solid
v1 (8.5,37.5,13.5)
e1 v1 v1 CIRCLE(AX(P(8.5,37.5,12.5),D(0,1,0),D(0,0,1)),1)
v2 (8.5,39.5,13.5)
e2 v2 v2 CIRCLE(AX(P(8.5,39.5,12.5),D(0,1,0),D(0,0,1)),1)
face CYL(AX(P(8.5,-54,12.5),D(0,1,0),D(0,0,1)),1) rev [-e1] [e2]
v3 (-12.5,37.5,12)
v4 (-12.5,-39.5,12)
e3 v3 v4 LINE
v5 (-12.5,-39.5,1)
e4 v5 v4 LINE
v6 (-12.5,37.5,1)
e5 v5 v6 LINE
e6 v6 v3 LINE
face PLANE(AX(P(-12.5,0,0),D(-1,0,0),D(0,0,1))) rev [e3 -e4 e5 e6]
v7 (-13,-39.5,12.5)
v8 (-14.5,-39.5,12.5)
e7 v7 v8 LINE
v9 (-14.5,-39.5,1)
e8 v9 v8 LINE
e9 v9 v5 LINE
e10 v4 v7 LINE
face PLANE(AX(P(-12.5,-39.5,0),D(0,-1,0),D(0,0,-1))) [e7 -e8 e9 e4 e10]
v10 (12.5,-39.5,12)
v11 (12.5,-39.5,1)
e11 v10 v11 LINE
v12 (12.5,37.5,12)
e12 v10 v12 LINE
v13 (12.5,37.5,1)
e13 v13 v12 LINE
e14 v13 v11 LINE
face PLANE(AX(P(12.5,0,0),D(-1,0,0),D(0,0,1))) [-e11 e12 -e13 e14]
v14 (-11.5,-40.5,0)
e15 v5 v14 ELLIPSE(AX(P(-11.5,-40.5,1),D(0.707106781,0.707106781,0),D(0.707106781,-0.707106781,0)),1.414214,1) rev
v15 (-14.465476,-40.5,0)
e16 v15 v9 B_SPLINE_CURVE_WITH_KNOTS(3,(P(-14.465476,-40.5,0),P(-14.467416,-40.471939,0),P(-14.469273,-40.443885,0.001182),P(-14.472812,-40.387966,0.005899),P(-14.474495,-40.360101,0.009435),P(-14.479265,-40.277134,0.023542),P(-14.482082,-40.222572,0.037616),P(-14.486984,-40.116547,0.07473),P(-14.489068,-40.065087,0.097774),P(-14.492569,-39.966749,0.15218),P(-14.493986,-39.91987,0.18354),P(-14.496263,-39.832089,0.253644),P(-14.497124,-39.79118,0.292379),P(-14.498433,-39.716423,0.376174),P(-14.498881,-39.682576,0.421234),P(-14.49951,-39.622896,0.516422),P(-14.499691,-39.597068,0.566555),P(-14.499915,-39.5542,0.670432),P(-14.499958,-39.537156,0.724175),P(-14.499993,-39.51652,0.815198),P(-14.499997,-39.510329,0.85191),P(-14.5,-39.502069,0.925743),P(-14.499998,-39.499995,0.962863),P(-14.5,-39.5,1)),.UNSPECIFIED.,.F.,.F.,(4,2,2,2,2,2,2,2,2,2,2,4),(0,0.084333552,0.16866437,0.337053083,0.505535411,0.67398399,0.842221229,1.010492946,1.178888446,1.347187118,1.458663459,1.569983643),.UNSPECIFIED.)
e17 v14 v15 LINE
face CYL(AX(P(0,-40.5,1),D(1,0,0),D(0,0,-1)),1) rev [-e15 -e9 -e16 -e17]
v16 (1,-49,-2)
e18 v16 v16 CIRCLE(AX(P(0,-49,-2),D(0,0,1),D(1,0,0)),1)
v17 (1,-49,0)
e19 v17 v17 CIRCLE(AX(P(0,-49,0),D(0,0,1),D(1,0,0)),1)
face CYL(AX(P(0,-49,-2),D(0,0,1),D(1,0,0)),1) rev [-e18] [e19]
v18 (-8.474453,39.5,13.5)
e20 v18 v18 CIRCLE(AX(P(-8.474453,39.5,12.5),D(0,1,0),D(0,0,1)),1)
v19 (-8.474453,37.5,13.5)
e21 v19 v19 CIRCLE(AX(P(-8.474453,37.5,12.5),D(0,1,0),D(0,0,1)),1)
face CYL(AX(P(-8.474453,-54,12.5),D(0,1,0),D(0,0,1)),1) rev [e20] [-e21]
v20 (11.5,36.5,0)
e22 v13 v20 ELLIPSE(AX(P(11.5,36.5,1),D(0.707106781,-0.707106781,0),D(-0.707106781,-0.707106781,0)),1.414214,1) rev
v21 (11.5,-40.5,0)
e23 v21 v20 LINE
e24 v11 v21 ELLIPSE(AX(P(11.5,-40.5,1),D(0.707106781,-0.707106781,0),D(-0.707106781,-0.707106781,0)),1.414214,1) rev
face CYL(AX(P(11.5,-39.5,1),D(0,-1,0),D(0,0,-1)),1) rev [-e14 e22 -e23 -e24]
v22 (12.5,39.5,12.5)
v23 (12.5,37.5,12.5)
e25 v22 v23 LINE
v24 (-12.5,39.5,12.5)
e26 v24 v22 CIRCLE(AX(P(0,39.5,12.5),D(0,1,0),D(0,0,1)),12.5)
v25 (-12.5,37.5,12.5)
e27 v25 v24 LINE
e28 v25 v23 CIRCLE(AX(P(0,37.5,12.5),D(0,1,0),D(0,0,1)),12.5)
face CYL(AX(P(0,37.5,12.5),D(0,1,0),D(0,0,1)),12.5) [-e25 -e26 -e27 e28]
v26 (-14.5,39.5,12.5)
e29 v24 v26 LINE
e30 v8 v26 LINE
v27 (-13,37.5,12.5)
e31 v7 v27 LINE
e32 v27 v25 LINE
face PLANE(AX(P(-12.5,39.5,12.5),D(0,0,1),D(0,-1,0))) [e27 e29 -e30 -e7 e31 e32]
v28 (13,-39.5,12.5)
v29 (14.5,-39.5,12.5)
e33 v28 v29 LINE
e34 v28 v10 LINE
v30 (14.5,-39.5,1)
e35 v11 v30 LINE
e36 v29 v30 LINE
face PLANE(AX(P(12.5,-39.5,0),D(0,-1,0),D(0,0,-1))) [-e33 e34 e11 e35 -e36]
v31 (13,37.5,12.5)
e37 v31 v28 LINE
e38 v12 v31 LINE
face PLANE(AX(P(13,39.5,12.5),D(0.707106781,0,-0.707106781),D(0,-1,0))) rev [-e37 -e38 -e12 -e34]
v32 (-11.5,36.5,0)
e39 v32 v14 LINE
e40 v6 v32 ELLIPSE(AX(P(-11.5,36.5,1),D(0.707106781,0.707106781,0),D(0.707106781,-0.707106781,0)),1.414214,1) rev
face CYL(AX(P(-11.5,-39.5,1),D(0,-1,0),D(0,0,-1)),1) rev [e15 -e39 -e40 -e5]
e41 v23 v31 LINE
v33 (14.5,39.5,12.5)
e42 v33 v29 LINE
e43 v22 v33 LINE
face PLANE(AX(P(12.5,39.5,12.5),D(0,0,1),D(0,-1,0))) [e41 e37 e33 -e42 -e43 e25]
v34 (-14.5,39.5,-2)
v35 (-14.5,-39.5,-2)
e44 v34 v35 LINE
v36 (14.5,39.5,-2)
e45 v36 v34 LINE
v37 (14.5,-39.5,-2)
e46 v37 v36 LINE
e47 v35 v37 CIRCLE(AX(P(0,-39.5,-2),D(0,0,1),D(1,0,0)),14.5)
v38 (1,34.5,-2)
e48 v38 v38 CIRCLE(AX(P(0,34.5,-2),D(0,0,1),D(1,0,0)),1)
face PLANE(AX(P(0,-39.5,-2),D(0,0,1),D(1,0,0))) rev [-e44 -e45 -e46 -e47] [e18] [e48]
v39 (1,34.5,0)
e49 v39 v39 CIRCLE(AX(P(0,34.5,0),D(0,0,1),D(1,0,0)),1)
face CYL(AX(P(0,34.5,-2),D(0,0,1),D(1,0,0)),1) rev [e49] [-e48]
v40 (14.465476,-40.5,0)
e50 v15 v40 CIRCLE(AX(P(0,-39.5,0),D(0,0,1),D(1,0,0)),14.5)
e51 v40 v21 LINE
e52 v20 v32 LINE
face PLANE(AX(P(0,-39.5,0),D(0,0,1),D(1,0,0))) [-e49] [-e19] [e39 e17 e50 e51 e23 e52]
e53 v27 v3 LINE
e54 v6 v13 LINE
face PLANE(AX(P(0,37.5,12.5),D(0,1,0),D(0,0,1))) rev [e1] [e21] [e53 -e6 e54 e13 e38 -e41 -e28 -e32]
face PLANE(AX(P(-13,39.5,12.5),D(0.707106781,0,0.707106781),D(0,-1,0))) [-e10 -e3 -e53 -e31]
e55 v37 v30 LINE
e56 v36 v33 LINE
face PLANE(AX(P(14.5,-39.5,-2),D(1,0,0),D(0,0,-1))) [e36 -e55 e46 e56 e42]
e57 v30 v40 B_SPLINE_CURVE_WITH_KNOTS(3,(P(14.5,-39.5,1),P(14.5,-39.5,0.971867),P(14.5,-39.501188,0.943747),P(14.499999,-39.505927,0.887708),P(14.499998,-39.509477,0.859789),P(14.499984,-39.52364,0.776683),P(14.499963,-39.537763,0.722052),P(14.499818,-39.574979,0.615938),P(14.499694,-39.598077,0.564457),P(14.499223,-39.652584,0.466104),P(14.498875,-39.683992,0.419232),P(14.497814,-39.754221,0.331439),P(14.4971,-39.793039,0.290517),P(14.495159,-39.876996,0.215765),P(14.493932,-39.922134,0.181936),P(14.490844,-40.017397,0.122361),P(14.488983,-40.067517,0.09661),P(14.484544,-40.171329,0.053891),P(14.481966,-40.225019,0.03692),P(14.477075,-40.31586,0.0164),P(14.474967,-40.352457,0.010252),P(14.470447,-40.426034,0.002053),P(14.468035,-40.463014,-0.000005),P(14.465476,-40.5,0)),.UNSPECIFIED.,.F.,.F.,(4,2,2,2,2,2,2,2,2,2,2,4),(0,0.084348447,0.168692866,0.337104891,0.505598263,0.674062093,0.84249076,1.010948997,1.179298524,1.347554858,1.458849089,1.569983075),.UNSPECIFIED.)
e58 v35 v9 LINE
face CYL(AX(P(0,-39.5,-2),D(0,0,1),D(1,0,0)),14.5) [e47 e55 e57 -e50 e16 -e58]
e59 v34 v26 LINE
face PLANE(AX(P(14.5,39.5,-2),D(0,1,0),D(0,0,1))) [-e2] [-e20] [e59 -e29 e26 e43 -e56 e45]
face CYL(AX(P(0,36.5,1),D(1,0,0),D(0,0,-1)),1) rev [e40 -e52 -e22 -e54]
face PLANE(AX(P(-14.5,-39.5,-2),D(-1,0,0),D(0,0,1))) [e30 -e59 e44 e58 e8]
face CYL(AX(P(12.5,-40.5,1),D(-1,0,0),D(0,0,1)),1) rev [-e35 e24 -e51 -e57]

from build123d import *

# Parameters (mm, degrees)
ESQUISSE1_R             = 1
BOSS_EXTRU_2_DEPTH      = 2
ESQUISSE4_W             = 12.5
ESQUISSE4_H             = 79
BOSS_EXTRU_3_DEPTH      = 2
ESQUISSE6_W             = 12.5
ESQUISSE6_H             = 79
BOSS_EXTRU_4_DEPTH      = 2
BOSS_EXTRU_7_DEPTH      = 2
ESQUISSE14_R            = 1
ENL_V_MAT_EXTRU_4_DEPTH = 98.864702523
CHANFREIN3_SIZE         = 0.5
CONG_1_R                = 1


with BuildPart() as part:
    # Esquisse1 → Boss.-Extru.2 (new body)
    with BuildSketch(Plane.XY):
        with BuildLine():
            Line((14.5, -39.5), (14.5, 39.5))
            Line((14.5, 39.5), (-14.5, 39.5))
            Line((-14.5, 39.5), (-14.5, -39.5))
            ThreePointArc((-14.5, -39.5), (0, -54), (14.5, -39.5))
        make_face()
        with Locations((0, 34.5)):
            Circle(ESQUISSE1_R, mode=Mode.SUBTRACT)
        with Locations((0, -49)):
            Circle(ESQUISSE1_R, mode=Mode.SUBTRACT)
    extrude(amount=-BOSS_EXTRU_2_DEPTH)

    # Esquisse4 → Boss.-Extru.3 (add)
    with BuildSketch(Plane.ZY.offset(14.5)):
        with Locations((6.25, 0)):
            Rectangle(ESQUISSE4_W, ESQUISSE4_H)
    extrude(amount=-BOSS_EXTRU_3_DEPTH)

    # Esquisse6 → Boss.-Extru.4 (add)
    with BuildSketch(Plane(origin=(14.5, 0, 0), x_dir=(0, 0, -1), z_dir=(1, 0, 0))):
        with Locations((-6.25, 0)):
            Rectangle(ESQUISSE6_W, ESQUISSE6_H)
    extrude(amount=-BOSS_EXTRU_4_DEPTH)

    # Esquisse11 → Boss.-Extru.7 (add)
    with BuildSketch(Plane(origin=(0, 39.5, 0), x_dir=(1, 0, 0), z_dir=(0, 1, 0))):
        with BuildLine():
            Line((-12.5, 0), (12.5, 0))
            Line((12.5, 0), (12.5, -12.5))
            ThreePointArc((12.5, -12.5), (0, -25), (-12.5, -12.5))
            Line((-12.5, -12.5), (-12.5, 0))
        make_face()
    extrude(amount=-BOSS_EXTRU_7_DEPTH)

    # Esquisse14 → Enlèv. mat.-Extru.4 (cut, through all)
    with BuildSketch(Plane(origin=(0, 39.5, 0), x_dir=(1, 0, 0), z_dir=(0, 1, 0))):
        with Locations(Location((-8.474453363, -12.5, 0), (0, 0, 270))):
            Circle(ESQUISSE14_R)
        with Locations(Location((8.5, -12.5, 0), (0, 0, 270))):
            Circle(ESQUISSE14_R)
    extrude(amount=-ENL_V_MAT_EXTRU_4_DEPTH, mode=Mode.SUBTRACT)

    # Chanfrein3
    chanfrein3_edges = [part.edges().sort_by_distance(p)[0] for p in [
        (-12.5, -1, 12.5),
        (12.5, -1, 12.5),
    ]]
    chamfer(chanfrein3_edges, length=CHANFREIN3_SIZE)

    # Congé1
    # the kernel refuses this fillet: 1 mm, written as the material it adds along each edge
    with BuildSketch(Plane(origin=(-14.5, -39.5, 0), x_dir=(0, -1, 0), z_dir=(1, 0, 0))) as cong_1_piece_1_section:
        with BuildLine():
            CenterArc((CONG_1_R, -CONG_1_R), CONG_1_R, 90, 90)
            Line((0, -CONG_1_R), (-CONG_1_R * 0.02, -CONG_1_R))
            Line((-CONG_1_R * 0.02, -CONG_1_R), (-CONG_1_R * 0.02, CONG_1_R * 0.02))
            Line((-CONG_1_R * 0.02, CONG_1_R * 0.02), (CONG_1_R, CONG_1_R * 0.02))
            Line((CONG_1_R, CONG_1_R * 0.02), (CONG_1_R, 0))
        make_face()
    cong_1_piece_1 = extrude(amount=2, mode=Mode.PRIVATE)
    cong_1_piece_1 = cong_1_piece_1 & Plane(origin=(0, -39.5, 0.22667443), x_dir=(-1, 0, 0), z_dir=(0, 0, 1)) * Cylinder(14.5, 8, mode=Mode.PRIVATE)
    add(cong_1_piece_1)
    with BuildSketch(Plane(origin=(12.5, -39.5, 0), x_dir=(0, 0, 1), z_dir=(0, 1, 0)), Plane(origin=(-12.5, -39.5, 0), x_dir=(1, 0, 0), z_dir=(0, 1, 0))) as cong_1_piece_2:
        with BuildLine():
            CenterArc((CONG_1_R, -CONG_1_R), CONG_1_R, 90, 90)
            Line((0, -CONG_1_R), (-CONG_1_R * 0.02, -CONG_1_R))
            Line((-CONG_1_R * 0.02, -CONG_1_R), (-CONG_1_R * 0.02, CONG_1_R * 0.02))
            Line((-CONG_1_R * 0.02, CONG_1_R * 0.02), (CONG_1_R, CONG_1_R * 0.02))
            Line((CONG_1_R, CONG_1_R * 0.02), (CONG_1_R, 0))
        make_face()
    extrude(amount=77)
    with BuildSketch(Plane(origin=(14.5, -39.5, 0), x_dir=(0, 0, 1), z_dir=(-1, 0, 0))) as cong_1_piece_3_section:
        with BuildLine():
            CenterArc((CONG_1_R, -CONG_1_R), CONG_1_R, 90, 90)
            Line((0, -CONG_1_R), (-CONG_1_R * 0.02, -CONG_1_R))
            Line((-CONG_1_R * 0.02, -CONG_1_R), (-CONG_1_R * 0.02, CONG_1_R * 0.02))
            Line((-CONG_1_R * 0.02, CONG_1_R * 0.02), (CONG_1_R, CONG_1_R * 0.02))
            Line((CONG_1_R, CONG_1_R * 0.02), (CONG_1_R, 0))
        make_face()
    cong_1_piece_3 = extrude(amount=2, mode=Mode.PRIVATE)
    cong_1_piece_3 = cong_1_piece_3 & Plane(origin=(0, -39.5, 0.226674419), x_dir=(-1, 0, 0), z_dir=(0, 0, 1)) * Cylinder(14.5, 8, mode=Mode.PRIVATE)
    add(cong_1_piece_3)
    with BuildSketch(Plane(origin=(-12.5, 37.5, 0), x_dir=(0, 0, 1), z_dir=(1, 0, 0))) as cong_1_piece_4:
        with BuildLine():
            CenterArc((CONG_1_R, CONG_1_R), CONG_1_R, 180, 90)
            Line((0, CONG_1_R), (-CONG_1_R * 0.02, CONG_1_R))
            Line((-CONG_1_R * 0.02, CONG_1_R), (-CONG_1_R * 0.02, -CONG_1_R * 0.02))
            Line((-CONG_1_R * 0.02, -CONG_1_R * 0.02), (CONG_1_R, -CONG_1_R * 0.02))
            Line((CONG_1_R, -CONG_1_R * 0.02), (CONG_1_R, 0))
        make_face()
    extrude(amount=25)
    with BuildSketch(Plane(origin=(-14.5, -39.5, 0), x_dir=(0, -1, 0), z_dir=(1, 0, 0))) as cong_1_piece_5a_section:
        with BuildLine():
            CenterArc((CONG_1_R, -CONG_1_R), CONG_1_R, 90, 90)
            Line((0, -CONG_1_R), (-CONG_1_R * 0.02, -CONG_1_R))
            Line((-CONG_1_R * 0.02, -CONG_1_R), (-CONG_1_R * 0.02, CONG_1_R * 0.02))
            Line((-CONG_1_R * 0.02, CONG_1_R * 0.02), (CONG_1_R, CONG_1_R * 0.02))
            Line((CONG_1_R, CONG_1_R * 0.02), (CONG_1_R, 0))
        make_face()
    cong_1_piece_5a = extrude(amount=4.5, mode=Mode.PRIVATE)
    cong_1_piece_5a = split(cong_1_piece_5a, bisect_by=Plane(origin=(-12.5, -39.726395114, 0.226395114), z_dir=(1, 0, 0)), keep=Keep.TOP, mode=Mode.PRIVATE)
    with BuildSketch(Plane(origin=(-12.5, -42, 0), x_dir=(1, 0, 0), z_dir=(0, 1, 0))) as cong_1_piece_5b_section:
        with BuildLine():
            CenterArc((CONG_1_R, -CONG_1_R), CONG_1_R, 90, 90)
            Line((0, -CONG_1_R), (-CONG_1_R * 0.02, -CONG_1_R))
            Line((-CONG_1_R * 0.02, -CONG_1_R), (-CONG_1_R * 0.02, CONG_1_R * 0.02))
            Line((-CONG_1_R * 0.02, CONG_1_R * 0.02), (CONG_1_R, CONG_1_R * 0.02))
            Line((CONG_1_R, CONG_1_R * 0.02), (CONG_1_R, 0))
        make_face()
    cong_1_piece_5b = extrude(amount=79.5, mode=Mode.PRIVATE)
    cong_1_piece_5b = split(cong_1_piece_5b, bisect_by=Plane(origin=(-12.273604886, -39.5, 0.226395114), z_dir=(0, -1, 0)), keep=Keep.TOP, mode=Mode.PRIVATE)
    cong_1_piece_5 = cong_1_piece_5a & cong_1_piece_5b
    add(cong_1_piece_5)
    with BuildSketch(Plane(origin=(14.5, -39.5, 0), x_dir=(0, 0, 1), z_dir=(-1, 0, 0))) as cong_1_piece_6a_section:
        with BuildLine():
            CenterArc((CONG_1_R, -CONG_1_R), CONG_1_R, 90, 90)
            Line((0, -CONG_1_R), (-CONG_1_R * 0.02, -CONG_1_R))
            Line((-CONG_1_R * 0.02, -CONG_1_R), (-CONG_1_R * 0.02, CONG_1_R * 0.02))
            Line((-CONG_1_R * 0.02, CONG_1_R * 0.02), (CONG_1_R, CONG_1_R * 0.02))
            Line((CONG_1_R, CONG_1_R * 0.02), (CONG_1_R, 0))
        make_face()
    cong_1_piece_6a = extrude(amount=4.5, mode=Mode.PRIVATE)
    cong_1_piece_6a = split(cong_1_piece_6a, bisect_by=Plane(origin=(12.5, -39.726395114, 0.226395114), z_dir=(-1, 0, 0)), keep=Keep.TOP, mode=Mode.PRIVATE)
    with BuildSketch(Plane(origin=(12.5, -42, 0), x_dir=(0, 0, 1), z_dir=(0, 1, 0))) as cong_1_piece_6b_section:
        with BuildLine():
            CenterArc((CONG_1_R, -CONG_1_R), CONG_1_R, 90, 90)
            Line((0, -CONG_1_R), (-CONG_1_R * 0.02, -CONG_1_R))
            Line((-CONG_1_R * 0.02, -CONG_1_R), (-CONG_1_R * 0.02, CONG_1_R * 0.02))
            Line((-CONG_1_R * 0.02, CONG_1_R * 0.02), (CONG_1_R, CONG_1_R * 0.02))
            Line((CONG_1_R, CONG_1_R * 0.02), (CONG_1_R, 0))
        make_face()
    cong_1_piece_6b = extrude(amount=79.5, mode=Mode.PRIVATE)
    cong_1_piece_6b = split(cong_1_piece_6b, bisect_by=Plane(origin=(12.273604886, -39.5, 0.226395114), z_dir=(0, -1, 0)), keep=Keep.TOP, mode=Mode.PRIVATE)
    cong_1_piece_6 = cong_1_piece_6a & cong_1_piece_6b
    add(cong_1_piece_6)
    with BuildSketch(Plane(origin=(-12.5, 37.5, 0), x_dir=(0, 0, 1), z_dir=(1, 0, 0))) as cong_1_piece_7a_section:
        with BuildLine():
            CenterArc((CONG_1_R, CONG_1_R), CONG_1_R, 180, 90)
            Line((0, CONG_1_R), (-CONG_1_R * 0.02, CONG_1_R))
            Line((-CONG_1_R * 0.02, CONG_1_R), (-CONG_1_R * 0.02, -CONG_1_R * 0.02))
            Line((-CONG_1_R * 0.02, -CONG_1_R * 0.02), (CONG_1_R, -CONG_1_R * 0.02))
            Line((CONG_1_R, -CONG_1_R * 0.02), (CONG_1_R, 0))
        make_face()
    cong_1_piece_7a = extrude(amount=27.5, mode=Mode.PRIVATE)
    cong_1_piece_7a = split(cong_1_piece_7a, bisect_by=Plane(origin=(12.5, 37.273604886, 0.226395114), z_dir=(1, 0, 0)), keep=Keep.TOP, mode=Mode.PRIVATE)
    with BuildSketch(Plane(origin=(12.5, -39.5, 0), x_dir=(0, 0, 1), z_dir=(0, 1, 0))) as cong_1_piece_7b_section:
        with BuildLine():
            CenterArc((CONG_1_R, -CONG_1_R), CONG_1_R, 90, 90)
            Line((0, -CONG_1_R), (-CONG_1_R * 0.02, -CONG_1_R))
            Line((-CONG_1_R * 0.02, -CONG_1_R), (-CONG_1_R * 0.02, CONG_1_R * 0.02))
            Line((-CONG_1_R * 0.02, CONG_1_R * 0.02), (CONG_1_R, CONG_1_R * 0.02))
            Line((CONG_1_R, CONG_1_R * 0.02), (CONG_1_R, 0))
        make_face()
    cong_1_piece_7b = extrude(amount=79.5, mode=Mode.PRIVATE)
    cong_1_piece_7b = split(cong_1_piece_7b, bisect_by=Plane(origin=(12.273604886, 37.5, 0.226395114), z_dir=(0, 1, 0)), keep=Keep.TOP, mode=Mode.PRIVATE)
    cong_1_piece_7 = cong_1_piece_7a & cong_1_piece_7b
    add(cong_1_piece_7)
    with BuildSketch(Plane(origin=(-15, 37.5, 0), x_dir=(0, 0, 1), z_dir=(1, 0, 0))) as cong_1_piece_8a_section:
        with BuildLine():
            CenterArc((CONG_1_R, CONG_1_R), CONG_1_R, 180, 90)
            Line((0, CONG_1_R), (-CONG_1_R * 0.02, CONG_1_R))
            Line((-CONG_1_R * 0.02, CONG_1_R), (-CONG_1_R * 0.02, -CONG_1_R * 0.02))
            Line((-CONG_1_R * 0.02, -CONG_1_R * 0.02), (CONG_1_R, -CONG_1_R * 0.02))
            Line((CONG_1_R, -CONG_1_R * 0.02), (CONG_1_R, 0))
        make_face()
    cong_1_piece_8a = extrude(amount=27.5, mode=Mode.PRIVATE)
    cong_1_piece_8a = split(cong_1_piece_8a, bisect_by=Plane(origin=(-12.5, 37.273604886, 0.226395114), z_dir=(-1, 0, 0)), keep=Keep.TOP, mode=Mode.PRIVATE)
    with BuildSketch(Plane(origin=(-12.5, -39.5, 0), x_dir=(1, 0, 0), z_dir=(0, 1, 0))) as cong_1_piece_8b_section:
        with BuildLine():
            CenterArc((CONG_1_R, -CONG_1_R), CONG_1_R, 90, 90)
            Line((0, -CONG_1_R), (-CONG_1_R * 0.02, -CONG_1_R))
            Line((-CONG_1_R * 0.02, -CONG_1_R), (-CONG_1_R * 0.02, CONG_1_R * 0.02))
            Line((-CONG_1_R * 0.02, CONG_1_R * 0.02), (CONG_1_R, CONG_1_R * 0.02))
            Line((CONG_1_R, CONG_1_R * 0.02), (CONG_1_R, 0))
        make_face()
    cong_1_piece_8b = extrude(amount=79.5, mode=Mode.PRIVATE)
    cong_1_piece_8b = split(cong_1_piece_8b, bisect_by=Plane(origin=(-12.273604886, 37.5, 0.226395114), z_dir=(0, 1, 0)), keep=Keep.TOP, mode=Mode.PRIVATE)
    cong_1_piece_8 = cong_1_piece_8a & cong_1_piece_8b
    add(cong_1_piece_8)


solid = part.part
